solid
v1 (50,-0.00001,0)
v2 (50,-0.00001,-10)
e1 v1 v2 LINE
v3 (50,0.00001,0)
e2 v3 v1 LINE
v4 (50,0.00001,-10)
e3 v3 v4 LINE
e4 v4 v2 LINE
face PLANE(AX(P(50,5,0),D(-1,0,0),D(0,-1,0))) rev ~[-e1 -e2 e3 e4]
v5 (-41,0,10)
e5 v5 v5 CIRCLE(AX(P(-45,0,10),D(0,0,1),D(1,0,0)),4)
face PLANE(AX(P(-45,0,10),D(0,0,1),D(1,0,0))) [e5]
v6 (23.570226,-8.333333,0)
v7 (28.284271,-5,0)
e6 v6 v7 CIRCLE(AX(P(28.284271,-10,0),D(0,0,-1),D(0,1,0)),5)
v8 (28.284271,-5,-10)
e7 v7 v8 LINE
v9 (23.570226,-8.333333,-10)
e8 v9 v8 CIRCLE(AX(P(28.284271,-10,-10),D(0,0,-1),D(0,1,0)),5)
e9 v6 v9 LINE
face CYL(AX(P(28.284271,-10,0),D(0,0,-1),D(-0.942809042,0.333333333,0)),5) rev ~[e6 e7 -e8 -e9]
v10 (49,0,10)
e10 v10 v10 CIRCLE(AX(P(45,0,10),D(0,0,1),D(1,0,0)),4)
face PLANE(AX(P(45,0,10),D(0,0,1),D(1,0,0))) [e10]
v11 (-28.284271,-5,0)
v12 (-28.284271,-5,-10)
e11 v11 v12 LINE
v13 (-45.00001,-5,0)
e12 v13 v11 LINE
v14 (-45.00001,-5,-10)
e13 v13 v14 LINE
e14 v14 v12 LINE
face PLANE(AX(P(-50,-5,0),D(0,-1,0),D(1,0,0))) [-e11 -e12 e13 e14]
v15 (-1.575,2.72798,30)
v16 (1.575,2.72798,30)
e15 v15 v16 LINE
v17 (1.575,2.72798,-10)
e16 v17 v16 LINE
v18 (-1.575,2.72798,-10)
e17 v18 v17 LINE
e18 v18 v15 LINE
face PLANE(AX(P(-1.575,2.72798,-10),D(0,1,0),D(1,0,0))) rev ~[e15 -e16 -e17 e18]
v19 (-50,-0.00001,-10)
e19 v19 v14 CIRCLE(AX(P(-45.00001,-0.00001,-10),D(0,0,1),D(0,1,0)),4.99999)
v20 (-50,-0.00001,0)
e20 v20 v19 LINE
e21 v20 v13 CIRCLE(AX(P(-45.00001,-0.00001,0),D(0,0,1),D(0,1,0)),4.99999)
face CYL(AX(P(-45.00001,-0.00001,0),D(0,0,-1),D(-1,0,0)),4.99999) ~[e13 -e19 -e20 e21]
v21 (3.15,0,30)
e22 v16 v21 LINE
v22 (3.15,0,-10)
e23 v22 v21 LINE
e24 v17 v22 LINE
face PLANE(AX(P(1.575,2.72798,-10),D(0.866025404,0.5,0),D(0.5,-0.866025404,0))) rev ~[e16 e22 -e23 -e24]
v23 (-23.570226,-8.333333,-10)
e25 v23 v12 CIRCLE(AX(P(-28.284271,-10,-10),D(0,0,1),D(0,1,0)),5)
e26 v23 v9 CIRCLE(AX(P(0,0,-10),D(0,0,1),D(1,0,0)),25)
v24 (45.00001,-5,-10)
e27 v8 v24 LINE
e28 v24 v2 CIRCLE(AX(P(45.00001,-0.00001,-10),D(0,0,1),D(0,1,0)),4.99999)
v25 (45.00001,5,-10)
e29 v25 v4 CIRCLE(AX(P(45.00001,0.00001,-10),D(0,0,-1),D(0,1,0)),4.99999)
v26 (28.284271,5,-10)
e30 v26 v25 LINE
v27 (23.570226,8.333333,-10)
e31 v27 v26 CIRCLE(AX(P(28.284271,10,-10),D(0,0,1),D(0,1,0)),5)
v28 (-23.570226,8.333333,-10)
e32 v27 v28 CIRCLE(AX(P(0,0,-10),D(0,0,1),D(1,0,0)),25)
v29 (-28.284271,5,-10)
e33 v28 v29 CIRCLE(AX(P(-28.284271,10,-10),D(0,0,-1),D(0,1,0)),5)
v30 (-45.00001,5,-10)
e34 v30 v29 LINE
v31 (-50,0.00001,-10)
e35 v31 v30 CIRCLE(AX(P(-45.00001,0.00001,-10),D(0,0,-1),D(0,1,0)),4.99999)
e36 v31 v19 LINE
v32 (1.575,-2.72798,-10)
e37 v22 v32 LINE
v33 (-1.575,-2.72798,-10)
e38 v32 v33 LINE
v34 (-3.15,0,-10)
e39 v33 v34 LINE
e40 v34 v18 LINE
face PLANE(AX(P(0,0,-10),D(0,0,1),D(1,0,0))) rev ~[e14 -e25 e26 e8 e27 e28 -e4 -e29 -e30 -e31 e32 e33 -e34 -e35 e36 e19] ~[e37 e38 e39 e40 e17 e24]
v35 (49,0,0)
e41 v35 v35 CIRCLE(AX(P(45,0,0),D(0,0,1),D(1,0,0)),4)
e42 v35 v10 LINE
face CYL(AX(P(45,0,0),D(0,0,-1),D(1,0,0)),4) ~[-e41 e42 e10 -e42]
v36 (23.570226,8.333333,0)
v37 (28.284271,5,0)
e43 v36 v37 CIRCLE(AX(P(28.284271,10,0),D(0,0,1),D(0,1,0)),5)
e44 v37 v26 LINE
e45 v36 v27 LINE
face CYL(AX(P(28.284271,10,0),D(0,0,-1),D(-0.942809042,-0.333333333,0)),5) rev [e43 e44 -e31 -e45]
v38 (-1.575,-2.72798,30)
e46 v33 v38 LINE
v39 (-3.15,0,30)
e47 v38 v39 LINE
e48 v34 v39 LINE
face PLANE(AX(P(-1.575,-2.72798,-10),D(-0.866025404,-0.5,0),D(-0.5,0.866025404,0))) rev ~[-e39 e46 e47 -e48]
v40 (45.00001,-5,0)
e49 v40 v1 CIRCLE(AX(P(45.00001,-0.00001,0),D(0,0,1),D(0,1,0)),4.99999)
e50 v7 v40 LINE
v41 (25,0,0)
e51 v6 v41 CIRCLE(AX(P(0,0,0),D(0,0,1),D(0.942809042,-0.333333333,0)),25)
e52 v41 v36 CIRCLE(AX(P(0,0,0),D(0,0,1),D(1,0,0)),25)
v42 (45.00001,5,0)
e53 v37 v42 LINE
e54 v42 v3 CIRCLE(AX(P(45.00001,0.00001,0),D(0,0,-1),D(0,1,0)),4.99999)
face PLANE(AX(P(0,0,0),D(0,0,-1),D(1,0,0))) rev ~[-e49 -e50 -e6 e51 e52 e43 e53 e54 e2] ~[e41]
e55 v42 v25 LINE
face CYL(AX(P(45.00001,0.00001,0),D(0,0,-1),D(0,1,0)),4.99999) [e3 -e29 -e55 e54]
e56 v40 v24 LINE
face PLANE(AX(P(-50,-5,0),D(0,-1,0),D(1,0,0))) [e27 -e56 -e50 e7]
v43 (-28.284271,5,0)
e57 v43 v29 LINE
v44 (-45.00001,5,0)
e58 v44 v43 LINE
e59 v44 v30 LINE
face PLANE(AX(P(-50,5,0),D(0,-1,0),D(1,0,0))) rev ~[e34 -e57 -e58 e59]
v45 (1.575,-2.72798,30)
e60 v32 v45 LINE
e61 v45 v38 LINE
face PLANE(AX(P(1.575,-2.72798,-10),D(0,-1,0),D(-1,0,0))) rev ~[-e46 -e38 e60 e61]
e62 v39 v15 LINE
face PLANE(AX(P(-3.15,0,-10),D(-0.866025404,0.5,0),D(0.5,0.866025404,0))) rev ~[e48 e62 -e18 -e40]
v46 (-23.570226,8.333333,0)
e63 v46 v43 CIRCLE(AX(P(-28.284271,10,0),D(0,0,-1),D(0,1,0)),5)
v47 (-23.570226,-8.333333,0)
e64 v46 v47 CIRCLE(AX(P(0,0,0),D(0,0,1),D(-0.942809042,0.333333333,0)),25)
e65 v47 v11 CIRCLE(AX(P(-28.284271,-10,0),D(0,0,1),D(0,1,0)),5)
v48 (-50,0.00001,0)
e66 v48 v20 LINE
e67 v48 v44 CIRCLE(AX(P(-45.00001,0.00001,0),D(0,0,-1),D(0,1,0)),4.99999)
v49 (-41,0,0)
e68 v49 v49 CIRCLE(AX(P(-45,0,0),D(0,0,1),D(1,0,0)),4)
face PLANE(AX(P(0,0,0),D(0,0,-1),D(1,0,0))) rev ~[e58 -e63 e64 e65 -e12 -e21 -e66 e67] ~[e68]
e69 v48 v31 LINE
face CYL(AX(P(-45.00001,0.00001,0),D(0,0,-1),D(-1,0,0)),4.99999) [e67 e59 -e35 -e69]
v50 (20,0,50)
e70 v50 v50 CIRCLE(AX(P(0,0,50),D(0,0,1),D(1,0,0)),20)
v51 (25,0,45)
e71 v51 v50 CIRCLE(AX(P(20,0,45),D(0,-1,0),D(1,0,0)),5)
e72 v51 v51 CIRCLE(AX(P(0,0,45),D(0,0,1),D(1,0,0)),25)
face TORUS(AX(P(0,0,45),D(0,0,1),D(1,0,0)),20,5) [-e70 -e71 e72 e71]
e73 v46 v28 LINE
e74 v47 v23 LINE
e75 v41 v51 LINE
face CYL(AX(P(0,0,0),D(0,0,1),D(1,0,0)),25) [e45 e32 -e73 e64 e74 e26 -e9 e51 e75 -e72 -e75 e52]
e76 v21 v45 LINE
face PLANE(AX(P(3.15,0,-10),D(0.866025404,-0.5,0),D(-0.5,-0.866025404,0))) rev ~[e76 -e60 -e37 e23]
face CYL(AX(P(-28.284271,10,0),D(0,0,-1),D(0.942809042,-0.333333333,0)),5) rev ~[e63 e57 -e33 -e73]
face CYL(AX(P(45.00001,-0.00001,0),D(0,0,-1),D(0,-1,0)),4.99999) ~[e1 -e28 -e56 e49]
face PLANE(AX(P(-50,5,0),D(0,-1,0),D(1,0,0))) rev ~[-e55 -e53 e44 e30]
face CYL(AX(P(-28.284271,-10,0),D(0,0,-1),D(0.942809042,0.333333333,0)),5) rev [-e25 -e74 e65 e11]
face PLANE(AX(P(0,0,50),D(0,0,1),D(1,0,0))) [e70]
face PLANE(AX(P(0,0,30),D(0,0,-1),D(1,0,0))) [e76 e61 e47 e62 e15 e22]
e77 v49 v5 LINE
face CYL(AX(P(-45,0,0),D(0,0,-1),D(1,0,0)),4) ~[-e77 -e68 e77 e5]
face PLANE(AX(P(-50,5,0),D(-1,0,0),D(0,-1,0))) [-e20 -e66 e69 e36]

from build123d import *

# Parameters (mm, degrees)
F0_R      = 25
F1_DEPTH  = 50
F2_R      = 5
F3_W      = 100
F3_H      = 10
F4_DEPTH  = 10
F5_R      = 4.99999
F6_R      = 4
F7_DEPTH  = 10
F8_DEPTH  = 10
F10_DEPTH = 40
F11_R     = 5


# Not quite as in the source:
# - a fillet or chamfer is up to 0.001 mm smaller than in the source, because OpenCascade refuses the exact size


with BuildPart() as f1:
    # F0 (on Top) → F1 (new body)
    with BuildSketch(Plane.XY):
        Circle(F0_R)
    extrude(amount=F1_DEPTH)

    # F2
    f2_edges = [f1.edges().sort_by_distance(p)[0] for p in [
        (-25, 0, 50),
    ]]
    fillet(f2_edges, radius=F2_R)

    # F3 (on face) → F4 (join)
    with BuildSketch(Plane(origin=(0, 0, 0), x_dir=(1, 0, 0), z_dir=(0, 0, -1))):
        Rectangle(F3_W, F3_H)
    extrude(amount=F4_DEPTH)

    # F5 (radius 5 in the source; OpenCascade refuses exactly that, so slightly less here)
    f5_edges = [f1.edges().sort_by_distance(p)[0] for p in [
        (-50, 5, -5),
        (-50, -5, -5),
        (50, -5, -5),
        (50, 5, -5),
    ]]
    fillet(f5_edges, radius=F5_R)

    # F6 (on face) → F7 (join)
    with BuildSketch(Plane.XY):
        with Locations((-45, 0)):
            Circle(F6_R)
        with Locations((45, 0)):
            Circle(F6_R)
    extrude(amount=F7_DEPTH)

    # F8 (add): faces of the model
    f8_faces = [f1.faces().sort_by_distance(p)[0] for p in [
        (0, -13.3591920493, 0),
        (0, 13.3591920493, 0),
    ]]
    extrude(f8_faces, amount=F8_DEPTH)

    # F9 (on face) → F10 (cut)
    with BuildSketch(Plane(origin=(0, 0, -10), x_dir=(1, 0, 0), z_dir=(0, 0, -1))):
        Polygon((1.575, 2.7279800219), (-1.575, 2.7279800219), (-3.15, 0), (-1.575, -2.7279800219), (1.575, -2.7279800219), (3.15, 0), align=None)
    extrude(amount=-F10_DEPTH, mode=Mode.SUBTRACT)

    # F11
    f11_edges = [f1.edges().sort_by_distance(p)[0] for p in [
        (23.535534, 0, 48.535534),
        (-25, 0, 45),
        (-20, 0, 50),
        (24.494897, 5, -5),
        (24.494897, -5, -5),
        (-24.494897, -5, -5),
        (-24.494897, 5, -5),
    ]]
    fillet(f11_edges, radius=F11_R)


solid = f1.part
